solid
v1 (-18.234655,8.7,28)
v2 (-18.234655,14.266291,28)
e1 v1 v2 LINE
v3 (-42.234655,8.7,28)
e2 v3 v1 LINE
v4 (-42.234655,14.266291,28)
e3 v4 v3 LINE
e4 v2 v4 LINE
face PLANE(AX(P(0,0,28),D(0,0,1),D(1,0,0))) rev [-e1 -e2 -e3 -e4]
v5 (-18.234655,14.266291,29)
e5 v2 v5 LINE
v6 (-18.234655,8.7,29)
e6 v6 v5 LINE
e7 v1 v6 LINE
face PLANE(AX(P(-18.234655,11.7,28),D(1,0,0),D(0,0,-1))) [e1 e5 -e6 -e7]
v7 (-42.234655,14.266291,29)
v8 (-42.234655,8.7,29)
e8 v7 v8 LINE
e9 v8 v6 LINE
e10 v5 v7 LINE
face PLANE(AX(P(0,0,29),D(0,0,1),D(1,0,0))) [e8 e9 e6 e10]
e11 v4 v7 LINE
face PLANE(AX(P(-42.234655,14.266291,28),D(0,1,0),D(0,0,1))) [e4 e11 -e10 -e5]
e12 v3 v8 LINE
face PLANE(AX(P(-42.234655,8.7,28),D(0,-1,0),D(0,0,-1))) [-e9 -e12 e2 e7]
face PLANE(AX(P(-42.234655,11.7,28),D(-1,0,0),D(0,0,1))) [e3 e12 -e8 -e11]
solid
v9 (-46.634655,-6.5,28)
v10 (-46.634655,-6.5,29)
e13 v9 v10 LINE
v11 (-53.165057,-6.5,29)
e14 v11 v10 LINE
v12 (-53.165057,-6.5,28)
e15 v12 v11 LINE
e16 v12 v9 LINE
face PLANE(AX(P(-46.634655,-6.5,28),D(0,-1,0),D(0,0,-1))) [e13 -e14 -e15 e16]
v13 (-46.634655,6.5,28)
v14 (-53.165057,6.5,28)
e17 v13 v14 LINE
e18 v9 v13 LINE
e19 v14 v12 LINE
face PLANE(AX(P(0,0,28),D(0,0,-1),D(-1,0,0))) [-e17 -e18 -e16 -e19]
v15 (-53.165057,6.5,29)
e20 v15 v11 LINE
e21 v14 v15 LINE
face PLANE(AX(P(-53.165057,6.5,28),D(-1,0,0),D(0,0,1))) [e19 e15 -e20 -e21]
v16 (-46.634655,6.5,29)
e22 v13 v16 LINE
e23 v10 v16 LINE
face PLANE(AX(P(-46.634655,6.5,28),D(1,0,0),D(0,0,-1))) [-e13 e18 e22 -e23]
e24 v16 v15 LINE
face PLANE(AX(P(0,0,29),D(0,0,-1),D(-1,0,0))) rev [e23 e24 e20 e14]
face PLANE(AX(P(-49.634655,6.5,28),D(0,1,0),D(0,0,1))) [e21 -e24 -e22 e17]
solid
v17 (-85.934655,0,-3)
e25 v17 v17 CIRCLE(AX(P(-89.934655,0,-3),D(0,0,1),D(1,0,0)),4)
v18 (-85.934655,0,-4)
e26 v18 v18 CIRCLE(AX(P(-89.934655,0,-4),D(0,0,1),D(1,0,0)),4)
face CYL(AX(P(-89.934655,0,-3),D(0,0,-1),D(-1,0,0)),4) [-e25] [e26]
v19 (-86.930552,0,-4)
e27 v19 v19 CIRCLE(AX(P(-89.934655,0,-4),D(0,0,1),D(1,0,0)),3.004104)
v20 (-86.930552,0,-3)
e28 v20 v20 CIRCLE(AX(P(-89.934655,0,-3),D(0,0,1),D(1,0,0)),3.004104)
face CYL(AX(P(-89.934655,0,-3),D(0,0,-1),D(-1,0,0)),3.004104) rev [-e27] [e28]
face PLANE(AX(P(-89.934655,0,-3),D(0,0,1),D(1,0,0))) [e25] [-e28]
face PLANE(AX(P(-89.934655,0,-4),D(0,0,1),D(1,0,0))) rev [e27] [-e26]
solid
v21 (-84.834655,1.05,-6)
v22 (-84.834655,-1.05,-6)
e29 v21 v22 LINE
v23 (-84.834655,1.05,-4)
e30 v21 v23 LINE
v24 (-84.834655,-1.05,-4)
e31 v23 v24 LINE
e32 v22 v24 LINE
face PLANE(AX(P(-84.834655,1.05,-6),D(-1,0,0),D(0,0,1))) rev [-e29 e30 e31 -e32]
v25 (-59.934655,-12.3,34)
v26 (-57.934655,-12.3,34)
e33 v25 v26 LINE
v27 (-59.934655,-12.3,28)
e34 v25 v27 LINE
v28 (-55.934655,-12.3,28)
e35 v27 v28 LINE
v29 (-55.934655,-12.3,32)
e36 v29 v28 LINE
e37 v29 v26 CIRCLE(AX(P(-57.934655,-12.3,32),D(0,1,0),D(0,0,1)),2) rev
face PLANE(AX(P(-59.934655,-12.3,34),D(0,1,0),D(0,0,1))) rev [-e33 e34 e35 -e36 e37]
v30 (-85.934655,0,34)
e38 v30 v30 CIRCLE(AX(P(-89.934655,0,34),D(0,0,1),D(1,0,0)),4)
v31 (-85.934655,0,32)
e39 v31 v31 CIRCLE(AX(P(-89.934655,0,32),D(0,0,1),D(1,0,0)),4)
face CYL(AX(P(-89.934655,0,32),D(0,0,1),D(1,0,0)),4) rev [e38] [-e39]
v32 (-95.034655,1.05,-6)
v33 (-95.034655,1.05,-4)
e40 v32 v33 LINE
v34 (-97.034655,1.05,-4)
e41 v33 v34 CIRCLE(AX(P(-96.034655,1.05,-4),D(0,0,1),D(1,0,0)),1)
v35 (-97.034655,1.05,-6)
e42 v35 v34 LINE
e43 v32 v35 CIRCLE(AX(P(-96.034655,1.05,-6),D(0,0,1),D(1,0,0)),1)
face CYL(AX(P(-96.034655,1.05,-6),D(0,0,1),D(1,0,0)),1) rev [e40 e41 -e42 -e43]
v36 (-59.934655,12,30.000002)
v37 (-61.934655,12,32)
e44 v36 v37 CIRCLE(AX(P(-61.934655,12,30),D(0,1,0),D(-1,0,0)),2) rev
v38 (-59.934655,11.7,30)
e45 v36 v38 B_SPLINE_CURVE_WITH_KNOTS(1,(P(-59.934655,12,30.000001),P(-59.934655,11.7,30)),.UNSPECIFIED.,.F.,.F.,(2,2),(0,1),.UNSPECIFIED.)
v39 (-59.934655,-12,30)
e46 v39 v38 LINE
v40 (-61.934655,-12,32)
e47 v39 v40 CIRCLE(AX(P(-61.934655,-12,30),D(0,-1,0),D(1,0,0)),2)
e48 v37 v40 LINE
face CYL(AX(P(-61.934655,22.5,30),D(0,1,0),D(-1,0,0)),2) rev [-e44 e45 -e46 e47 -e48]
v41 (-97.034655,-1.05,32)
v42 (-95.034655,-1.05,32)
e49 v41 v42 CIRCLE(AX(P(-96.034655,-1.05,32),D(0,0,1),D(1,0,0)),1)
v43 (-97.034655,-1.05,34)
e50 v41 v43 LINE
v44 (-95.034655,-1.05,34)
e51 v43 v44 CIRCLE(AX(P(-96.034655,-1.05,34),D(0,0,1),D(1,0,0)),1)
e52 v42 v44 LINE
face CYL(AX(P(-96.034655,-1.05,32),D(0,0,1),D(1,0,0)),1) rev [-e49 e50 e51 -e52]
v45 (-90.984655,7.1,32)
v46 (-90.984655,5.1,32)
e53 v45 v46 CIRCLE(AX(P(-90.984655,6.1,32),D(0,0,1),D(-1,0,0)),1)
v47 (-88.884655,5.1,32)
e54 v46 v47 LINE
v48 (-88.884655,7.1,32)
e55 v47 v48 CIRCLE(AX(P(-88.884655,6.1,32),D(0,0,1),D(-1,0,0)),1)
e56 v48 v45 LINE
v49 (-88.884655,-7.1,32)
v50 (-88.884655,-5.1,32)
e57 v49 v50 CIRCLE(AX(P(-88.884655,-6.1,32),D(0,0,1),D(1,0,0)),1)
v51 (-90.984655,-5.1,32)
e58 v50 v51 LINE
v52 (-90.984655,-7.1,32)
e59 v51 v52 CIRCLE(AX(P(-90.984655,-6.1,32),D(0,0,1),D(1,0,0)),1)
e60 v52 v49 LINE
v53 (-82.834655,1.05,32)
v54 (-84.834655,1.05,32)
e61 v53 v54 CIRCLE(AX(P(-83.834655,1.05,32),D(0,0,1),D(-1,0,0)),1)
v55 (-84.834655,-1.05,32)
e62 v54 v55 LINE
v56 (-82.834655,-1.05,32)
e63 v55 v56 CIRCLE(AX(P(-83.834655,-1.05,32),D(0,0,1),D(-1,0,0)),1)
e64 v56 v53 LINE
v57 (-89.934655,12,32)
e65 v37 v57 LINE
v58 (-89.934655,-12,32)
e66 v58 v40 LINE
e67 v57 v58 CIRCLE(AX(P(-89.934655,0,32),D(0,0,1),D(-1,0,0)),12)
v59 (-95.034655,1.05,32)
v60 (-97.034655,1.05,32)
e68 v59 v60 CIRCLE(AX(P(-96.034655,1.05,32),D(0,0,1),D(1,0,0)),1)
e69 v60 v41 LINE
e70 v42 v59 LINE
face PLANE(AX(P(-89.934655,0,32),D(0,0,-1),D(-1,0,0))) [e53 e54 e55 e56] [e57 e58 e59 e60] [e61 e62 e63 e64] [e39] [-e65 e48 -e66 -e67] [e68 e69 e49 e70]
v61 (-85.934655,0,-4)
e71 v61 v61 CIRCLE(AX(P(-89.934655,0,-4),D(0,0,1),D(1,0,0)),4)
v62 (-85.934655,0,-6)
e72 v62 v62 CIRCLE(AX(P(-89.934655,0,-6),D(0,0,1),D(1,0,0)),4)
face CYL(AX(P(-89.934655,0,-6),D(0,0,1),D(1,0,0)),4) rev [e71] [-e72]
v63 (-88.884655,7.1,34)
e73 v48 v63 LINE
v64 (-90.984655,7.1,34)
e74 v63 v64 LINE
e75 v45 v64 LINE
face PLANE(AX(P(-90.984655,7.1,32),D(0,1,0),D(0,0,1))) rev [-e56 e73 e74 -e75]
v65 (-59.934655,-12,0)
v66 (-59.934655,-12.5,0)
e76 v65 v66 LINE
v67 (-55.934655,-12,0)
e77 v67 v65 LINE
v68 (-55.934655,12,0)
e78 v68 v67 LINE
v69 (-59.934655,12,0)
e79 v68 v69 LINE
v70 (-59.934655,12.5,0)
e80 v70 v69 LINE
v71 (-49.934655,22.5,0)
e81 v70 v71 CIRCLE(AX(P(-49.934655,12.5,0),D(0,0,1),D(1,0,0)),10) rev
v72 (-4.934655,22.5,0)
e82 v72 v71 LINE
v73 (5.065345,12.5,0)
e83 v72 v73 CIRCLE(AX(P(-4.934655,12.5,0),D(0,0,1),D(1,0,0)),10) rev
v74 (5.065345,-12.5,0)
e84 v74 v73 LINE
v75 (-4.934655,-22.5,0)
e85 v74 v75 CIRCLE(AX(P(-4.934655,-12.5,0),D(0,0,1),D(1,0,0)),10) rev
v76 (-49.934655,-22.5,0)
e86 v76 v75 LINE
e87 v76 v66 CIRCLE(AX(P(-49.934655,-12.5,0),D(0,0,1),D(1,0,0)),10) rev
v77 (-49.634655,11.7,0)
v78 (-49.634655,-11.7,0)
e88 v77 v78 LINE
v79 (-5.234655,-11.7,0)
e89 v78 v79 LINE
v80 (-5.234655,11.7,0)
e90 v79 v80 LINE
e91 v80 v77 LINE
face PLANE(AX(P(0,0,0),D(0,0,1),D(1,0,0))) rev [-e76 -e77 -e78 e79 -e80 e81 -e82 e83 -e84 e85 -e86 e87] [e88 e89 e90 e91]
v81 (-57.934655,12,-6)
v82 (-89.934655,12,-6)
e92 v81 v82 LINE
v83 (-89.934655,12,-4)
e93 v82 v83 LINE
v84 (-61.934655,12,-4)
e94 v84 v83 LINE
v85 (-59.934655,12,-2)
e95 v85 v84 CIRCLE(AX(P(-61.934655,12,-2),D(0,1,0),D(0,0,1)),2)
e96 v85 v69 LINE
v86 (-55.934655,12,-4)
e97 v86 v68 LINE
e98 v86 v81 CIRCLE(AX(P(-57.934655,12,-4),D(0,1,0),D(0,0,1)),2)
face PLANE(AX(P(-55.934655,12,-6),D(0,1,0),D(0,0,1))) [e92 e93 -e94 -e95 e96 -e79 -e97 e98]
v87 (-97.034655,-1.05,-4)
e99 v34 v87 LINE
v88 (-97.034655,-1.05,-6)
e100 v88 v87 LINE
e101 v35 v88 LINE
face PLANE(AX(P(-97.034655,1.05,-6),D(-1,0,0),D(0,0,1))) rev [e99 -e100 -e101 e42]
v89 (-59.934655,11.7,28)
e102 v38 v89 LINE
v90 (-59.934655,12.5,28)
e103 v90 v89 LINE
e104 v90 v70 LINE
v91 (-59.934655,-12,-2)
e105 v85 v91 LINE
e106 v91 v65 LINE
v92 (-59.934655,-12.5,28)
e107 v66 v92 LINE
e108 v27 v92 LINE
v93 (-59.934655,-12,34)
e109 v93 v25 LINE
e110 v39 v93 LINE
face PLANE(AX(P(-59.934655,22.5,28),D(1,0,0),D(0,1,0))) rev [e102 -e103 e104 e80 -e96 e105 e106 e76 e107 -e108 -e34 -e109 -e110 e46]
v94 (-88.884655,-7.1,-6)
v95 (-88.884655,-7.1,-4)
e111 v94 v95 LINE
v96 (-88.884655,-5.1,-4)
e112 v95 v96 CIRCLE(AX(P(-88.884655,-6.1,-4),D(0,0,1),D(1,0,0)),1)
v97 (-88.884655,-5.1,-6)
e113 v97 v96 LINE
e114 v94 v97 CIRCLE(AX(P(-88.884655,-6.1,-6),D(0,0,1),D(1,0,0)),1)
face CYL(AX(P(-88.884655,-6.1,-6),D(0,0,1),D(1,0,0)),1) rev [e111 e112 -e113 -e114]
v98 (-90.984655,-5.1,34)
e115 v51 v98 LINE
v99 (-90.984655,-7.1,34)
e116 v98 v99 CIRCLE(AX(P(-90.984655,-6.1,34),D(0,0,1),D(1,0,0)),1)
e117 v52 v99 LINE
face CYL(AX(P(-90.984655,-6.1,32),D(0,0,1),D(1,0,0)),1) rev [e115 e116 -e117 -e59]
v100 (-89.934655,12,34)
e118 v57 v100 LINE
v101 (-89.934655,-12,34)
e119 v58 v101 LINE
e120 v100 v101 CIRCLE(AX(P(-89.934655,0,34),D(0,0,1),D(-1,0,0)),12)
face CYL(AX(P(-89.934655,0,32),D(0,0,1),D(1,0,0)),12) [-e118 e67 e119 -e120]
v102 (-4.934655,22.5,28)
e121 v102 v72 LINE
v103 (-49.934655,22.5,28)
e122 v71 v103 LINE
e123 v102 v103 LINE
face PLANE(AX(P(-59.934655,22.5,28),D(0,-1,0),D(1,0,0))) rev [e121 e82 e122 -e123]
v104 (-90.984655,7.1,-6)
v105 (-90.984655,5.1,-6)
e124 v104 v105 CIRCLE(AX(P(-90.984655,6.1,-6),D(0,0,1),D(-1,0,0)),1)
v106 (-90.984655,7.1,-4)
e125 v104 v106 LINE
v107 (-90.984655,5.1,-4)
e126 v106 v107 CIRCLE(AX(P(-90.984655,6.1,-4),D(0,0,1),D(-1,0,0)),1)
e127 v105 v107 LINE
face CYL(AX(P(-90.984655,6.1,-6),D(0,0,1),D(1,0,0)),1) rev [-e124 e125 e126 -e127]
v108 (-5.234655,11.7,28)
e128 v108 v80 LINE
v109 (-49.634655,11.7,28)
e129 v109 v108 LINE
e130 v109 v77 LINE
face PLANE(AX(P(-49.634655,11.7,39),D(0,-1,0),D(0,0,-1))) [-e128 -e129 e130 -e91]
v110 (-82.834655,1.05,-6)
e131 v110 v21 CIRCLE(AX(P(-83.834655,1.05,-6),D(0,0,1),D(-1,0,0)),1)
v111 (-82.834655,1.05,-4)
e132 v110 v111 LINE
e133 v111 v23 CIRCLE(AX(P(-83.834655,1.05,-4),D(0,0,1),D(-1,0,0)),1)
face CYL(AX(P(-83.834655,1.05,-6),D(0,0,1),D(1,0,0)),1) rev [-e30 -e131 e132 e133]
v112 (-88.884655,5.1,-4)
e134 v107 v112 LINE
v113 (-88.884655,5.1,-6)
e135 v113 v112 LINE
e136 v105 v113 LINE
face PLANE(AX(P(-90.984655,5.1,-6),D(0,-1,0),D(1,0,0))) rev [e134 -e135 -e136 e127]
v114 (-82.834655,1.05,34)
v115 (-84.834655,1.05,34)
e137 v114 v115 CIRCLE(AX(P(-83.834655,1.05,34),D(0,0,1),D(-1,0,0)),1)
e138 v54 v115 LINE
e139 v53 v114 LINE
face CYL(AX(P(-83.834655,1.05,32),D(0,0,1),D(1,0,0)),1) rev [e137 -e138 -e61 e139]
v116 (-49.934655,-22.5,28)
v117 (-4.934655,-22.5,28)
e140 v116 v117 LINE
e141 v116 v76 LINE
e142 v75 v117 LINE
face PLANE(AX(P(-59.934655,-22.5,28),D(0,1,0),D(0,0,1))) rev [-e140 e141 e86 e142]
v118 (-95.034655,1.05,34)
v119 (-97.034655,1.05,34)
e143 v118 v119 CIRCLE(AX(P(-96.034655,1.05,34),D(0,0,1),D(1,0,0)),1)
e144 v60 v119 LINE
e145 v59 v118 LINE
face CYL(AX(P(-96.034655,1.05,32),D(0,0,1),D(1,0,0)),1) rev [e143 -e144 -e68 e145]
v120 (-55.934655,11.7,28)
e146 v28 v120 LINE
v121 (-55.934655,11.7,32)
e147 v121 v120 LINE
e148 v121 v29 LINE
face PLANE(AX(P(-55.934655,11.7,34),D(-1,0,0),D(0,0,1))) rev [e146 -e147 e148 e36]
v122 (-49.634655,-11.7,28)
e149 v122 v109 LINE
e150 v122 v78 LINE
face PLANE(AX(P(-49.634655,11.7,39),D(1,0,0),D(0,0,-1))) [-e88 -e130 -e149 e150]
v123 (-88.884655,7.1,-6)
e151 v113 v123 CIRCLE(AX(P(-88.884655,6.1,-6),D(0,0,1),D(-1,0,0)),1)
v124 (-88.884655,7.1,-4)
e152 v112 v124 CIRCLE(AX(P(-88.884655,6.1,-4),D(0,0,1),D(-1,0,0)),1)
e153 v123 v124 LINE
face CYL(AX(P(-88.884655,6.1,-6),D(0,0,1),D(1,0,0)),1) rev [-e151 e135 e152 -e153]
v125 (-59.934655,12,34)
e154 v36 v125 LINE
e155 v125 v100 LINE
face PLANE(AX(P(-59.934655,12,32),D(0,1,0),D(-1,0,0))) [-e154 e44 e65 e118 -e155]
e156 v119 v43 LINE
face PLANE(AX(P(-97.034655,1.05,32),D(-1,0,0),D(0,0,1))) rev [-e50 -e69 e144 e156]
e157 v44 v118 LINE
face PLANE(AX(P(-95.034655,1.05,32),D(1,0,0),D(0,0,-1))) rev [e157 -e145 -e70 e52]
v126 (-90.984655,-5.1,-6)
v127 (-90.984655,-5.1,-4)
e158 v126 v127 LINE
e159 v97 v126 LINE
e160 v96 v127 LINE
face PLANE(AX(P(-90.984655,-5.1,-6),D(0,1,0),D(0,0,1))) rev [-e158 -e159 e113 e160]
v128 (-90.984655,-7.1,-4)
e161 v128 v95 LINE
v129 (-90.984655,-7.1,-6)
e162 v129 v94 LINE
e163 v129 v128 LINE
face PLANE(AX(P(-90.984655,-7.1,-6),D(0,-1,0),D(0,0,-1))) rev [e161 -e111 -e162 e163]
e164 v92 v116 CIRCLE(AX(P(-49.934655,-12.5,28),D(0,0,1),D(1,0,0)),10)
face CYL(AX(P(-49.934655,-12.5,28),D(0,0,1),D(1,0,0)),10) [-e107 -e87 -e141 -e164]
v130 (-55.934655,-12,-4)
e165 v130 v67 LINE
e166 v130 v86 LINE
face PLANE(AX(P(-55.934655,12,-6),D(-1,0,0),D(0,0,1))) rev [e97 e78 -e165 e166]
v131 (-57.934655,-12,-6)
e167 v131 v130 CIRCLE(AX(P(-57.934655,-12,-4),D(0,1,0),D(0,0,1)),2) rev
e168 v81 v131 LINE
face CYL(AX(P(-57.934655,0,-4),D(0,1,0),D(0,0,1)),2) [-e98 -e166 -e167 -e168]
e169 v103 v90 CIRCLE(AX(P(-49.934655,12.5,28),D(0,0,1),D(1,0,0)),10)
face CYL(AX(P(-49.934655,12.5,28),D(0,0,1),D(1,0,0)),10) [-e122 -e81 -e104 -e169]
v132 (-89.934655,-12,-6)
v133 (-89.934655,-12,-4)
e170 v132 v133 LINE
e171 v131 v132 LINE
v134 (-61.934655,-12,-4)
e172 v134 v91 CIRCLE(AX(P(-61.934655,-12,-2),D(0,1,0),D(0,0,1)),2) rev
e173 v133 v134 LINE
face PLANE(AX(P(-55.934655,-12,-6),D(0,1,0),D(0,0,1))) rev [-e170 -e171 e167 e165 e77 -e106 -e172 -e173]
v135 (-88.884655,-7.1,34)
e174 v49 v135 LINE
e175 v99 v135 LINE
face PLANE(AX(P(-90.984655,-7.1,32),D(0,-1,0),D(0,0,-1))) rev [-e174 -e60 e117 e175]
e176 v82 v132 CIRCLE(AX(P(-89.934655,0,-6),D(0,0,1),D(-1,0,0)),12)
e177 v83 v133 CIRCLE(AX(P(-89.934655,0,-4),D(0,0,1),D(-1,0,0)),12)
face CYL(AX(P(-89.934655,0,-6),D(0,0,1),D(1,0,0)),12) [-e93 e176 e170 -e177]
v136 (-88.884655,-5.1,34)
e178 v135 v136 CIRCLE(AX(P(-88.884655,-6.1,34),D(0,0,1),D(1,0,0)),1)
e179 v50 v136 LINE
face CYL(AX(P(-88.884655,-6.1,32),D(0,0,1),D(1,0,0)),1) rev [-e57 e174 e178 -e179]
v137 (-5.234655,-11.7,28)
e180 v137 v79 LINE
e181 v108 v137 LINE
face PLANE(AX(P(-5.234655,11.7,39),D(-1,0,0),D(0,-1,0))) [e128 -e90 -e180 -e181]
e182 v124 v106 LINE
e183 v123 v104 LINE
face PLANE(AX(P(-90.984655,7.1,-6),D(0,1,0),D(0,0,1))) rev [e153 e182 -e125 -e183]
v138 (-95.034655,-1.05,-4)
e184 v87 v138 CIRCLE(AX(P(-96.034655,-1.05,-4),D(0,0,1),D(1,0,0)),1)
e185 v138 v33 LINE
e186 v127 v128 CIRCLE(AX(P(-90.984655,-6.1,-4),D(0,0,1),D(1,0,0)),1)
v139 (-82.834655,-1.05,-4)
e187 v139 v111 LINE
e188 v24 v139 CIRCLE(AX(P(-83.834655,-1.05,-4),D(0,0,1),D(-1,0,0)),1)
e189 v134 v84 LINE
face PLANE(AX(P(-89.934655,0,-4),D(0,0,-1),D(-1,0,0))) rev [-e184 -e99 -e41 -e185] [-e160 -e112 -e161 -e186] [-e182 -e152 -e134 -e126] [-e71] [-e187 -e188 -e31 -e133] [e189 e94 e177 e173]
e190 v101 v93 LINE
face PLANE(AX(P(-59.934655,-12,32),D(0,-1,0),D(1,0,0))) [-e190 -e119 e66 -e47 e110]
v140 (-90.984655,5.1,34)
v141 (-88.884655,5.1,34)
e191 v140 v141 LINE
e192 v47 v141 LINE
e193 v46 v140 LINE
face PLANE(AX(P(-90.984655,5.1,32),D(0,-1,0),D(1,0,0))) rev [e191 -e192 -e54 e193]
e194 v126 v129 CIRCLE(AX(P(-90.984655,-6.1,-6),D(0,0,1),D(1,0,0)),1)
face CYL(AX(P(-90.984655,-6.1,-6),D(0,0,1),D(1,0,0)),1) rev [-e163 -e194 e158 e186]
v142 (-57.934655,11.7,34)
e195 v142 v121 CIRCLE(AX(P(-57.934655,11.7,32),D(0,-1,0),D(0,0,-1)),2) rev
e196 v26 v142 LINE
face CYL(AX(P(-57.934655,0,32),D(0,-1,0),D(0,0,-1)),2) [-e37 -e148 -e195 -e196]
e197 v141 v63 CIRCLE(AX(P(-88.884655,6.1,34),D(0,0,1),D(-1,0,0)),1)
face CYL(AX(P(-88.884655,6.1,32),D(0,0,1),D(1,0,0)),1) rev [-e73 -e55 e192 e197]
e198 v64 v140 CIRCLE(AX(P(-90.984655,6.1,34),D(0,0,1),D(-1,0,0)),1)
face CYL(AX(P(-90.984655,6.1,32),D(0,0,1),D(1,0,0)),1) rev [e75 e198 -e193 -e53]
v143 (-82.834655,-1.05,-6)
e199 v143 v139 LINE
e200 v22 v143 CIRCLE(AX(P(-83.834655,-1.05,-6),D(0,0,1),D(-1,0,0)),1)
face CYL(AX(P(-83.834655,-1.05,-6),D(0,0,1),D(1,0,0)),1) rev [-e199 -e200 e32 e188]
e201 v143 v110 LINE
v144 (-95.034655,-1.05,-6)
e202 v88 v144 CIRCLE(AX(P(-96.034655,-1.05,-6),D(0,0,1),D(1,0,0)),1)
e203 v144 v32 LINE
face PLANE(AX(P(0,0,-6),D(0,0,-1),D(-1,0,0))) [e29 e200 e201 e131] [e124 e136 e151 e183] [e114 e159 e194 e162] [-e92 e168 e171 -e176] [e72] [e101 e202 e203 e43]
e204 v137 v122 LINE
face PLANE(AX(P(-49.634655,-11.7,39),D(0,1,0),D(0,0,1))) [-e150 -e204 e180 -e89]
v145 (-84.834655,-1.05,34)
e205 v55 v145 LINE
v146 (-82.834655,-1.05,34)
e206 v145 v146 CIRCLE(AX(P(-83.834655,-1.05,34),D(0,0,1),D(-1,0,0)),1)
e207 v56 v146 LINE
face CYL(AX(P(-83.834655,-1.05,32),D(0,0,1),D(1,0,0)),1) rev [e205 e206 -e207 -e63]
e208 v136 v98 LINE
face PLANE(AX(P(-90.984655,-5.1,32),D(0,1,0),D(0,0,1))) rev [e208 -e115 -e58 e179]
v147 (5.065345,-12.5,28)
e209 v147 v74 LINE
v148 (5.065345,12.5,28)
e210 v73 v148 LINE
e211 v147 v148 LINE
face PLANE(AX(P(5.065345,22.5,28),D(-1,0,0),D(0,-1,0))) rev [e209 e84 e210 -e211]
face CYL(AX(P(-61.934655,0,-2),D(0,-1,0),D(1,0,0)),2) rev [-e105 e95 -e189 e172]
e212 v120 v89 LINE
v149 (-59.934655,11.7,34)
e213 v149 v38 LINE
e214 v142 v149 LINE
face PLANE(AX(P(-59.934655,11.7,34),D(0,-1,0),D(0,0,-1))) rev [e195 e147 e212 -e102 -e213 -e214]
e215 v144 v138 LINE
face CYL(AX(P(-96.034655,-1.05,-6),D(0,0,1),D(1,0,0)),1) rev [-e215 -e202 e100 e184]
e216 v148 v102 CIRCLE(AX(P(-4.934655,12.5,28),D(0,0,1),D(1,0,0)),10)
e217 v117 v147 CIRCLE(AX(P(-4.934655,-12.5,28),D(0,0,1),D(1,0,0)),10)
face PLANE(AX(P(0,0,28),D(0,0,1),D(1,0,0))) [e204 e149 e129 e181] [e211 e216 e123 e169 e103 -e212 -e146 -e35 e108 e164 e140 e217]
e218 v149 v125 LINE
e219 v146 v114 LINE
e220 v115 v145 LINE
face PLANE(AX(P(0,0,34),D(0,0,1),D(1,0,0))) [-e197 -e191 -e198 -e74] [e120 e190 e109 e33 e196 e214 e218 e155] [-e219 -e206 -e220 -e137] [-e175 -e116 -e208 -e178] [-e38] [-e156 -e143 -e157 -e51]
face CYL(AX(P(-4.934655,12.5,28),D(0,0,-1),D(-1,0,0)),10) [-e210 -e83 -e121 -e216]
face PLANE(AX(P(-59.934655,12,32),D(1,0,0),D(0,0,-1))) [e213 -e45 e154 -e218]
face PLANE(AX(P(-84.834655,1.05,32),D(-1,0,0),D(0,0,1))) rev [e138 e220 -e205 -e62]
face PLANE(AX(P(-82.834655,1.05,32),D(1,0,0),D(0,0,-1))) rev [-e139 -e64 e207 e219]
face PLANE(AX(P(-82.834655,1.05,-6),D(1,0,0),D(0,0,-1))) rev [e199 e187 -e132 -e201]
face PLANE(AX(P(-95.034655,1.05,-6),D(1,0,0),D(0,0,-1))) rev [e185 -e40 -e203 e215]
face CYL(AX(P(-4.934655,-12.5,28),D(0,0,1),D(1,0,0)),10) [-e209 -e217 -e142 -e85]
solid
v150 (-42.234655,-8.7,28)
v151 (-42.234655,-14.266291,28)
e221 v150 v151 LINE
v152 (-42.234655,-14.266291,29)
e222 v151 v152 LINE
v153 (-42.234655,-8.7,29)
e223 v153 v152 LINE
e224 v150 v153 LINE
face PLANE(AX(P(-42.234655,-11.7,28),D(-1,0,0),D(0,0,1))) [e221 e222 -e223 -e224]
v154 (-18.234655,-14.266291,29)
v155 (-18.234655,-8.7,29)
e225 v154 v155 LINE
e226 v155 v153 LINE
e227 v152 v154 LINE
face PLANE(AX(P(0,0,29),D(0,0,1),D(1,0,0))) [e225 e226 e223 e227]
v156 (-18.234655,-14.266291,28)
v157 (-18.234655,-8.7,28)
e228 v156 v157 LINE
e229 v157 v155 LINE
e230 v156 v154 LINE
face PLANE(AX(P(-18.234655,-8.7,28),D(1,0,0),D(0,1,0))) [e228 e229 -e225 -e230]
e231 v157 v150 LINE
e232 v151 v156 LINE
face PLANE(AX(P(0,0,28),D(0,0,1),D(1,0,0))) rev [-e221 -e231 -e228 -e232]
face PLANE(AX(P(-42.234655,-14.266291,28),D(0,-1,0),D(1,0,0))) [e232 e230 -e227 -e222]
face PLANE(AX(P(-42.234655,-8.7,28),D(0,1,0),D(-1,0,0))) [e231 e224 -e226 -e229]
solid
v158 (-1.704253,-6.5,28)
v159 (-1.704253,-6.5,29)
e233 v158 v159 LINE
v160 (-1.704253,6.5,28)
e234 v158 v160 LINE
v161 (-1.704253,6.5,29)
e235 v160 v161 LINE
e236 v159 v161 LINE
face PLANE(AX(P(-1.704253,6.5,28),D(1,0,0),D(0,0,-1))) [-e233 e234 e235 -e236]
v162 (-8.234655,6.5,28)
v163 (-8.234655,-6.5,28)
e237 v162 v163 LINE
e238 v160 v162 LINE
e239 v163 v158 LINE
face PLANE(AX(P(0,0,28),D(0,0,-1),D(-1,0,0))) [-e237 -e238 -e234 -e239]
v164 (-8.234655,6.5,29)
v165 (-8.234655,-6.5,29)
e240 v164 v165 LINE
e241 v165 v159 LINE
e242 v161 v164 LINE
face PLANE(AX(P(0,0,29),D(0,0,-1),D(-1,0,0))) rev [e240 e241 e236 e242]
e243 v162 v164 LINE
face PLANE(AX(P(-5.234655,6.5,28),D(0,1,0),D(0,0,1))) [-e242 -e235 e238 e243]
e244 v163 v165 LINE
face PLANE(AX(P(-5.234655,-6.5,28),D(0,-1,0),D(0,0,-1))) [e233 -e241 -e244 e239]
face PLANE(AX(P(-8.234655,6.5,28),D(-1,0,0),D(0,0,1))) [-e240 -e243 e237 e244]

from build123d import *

# Parameters (mm, degrees)
SKETCH_1_W             = 65
SKETCH_1_H             = 45
EXTRUDE_1_DEPTH        = 28
SKETCH_2_W             = 44.4
SKETCH_2_H             = 23.4
CUT_EXTRUDE_1_DEPTH    = 39
SKETCH_3_W             = 4
SKETCH_3_H             = 24
EXTRUDE_2_DEPTH        = 6
SKETCH_7_R             = 4
EXTRUDE_3_DEPTH        = 1
SKETCH_8_W             = 4
SKETCH_8_H             = 24
EXTRUDE_4_DEPTH        = 6
FILLET_1_R             = 10
FILLET_2_R             = 10
FILLET_3_R             = 10
FILLET_4_R             = 10
PATTERN_LINEAR_2_COUNT = 2
PATTERN_LINEAR_2_PITCH = 38
FILLET_5_R             = 2
FILLET_6_R             = 2
FILLET_7_R             = 2
FILLET_8_R             = 2
SKETCH_9_R             = 4
SKETCH_9_R_2           = 3.004103595
EXTRUDE_5_DEPTH        = 1
EXTRUDE_6_DEPTH        = 1
EXTRUDE_6_2_DEPTH      = 1
EXTRUDE_6_3_DEPTH      = 1
EXTRUDE_6_4_DEPTH      = 1


with BuildPart() as part:
    # 草圖1 → 填料-伸長1 (new body)
    with BuildSketch(Plane.XY):
        with Locations((-27.434655272, 0)):
            Rectangle(SKETCH_1_W, SKETCH_1_H)
    extrude(amount=EXTRUDE_1_DEPTH)

    # 草圖2 → 除料-伸長1 (cut)
    with BuildSketch(Plane.XY):
        with Locations((-27.434655272, 0)):
            Rectangle(SKETCH_2_W, SKETCH_2_H)
    extrude(amount=CUT_EXTRUDE_1_DEPTH, mode=Mode.SUBTRACT)

    # 草圖3 → 填料-伸長2 (add)
    with BuildSketch(Plane.XY.offset(28)):
        with Locations((-57.934655272, -0.3)):
            Rectangle(SKETCH_3_W, SKETCH_3_H)
    extrude(amount=EXTRUDE_2_DEPTH)

    # 草圖7 → 填料-伸長3 (add, symmetric)
    with BuildSketch(Plane.XY.offset(33)):
        with BuildLine():
            Line((-59.934655272, 12), (-89.934655272, 12))
            ThreePointArc((-89.934655272, 12), (-101.934655272, 0), (-89.934655272, -12))
            Line((-89.934655272, -12), (-59.934655272, -12))
            Line((-59.934655272, -12), (-59.934655272, 12))
        make_face()
        with Locations((-89.934655272, 0)):
            Circle(SKETCH_7_R, mode=Mode.SUBTRACT)
        with BuildLine():
            Line((-95.034655272, 1.05), (-95.034655272, -1.05))
            ThreePointArc((-95.034655272, -1.05), (-96.034655272, -2.05), (-97.034655272, -1.05))
            Line((-97.034655272, -1.05), (-97.034655272, 1.05))
            ThreePointArc((-97.034655272, 1.05), (-96.034655272, 2.05), (-95.034655272, 1.05))
        make_face(mode=Mode.SUBTRACT)
        with BuildLine():
            Line((-90.984655272, -5.1), (-88.884655272, -5.1))
            ThreePointArc((-88.884655272, -5.1), (-87.884655272, -6.1), (-88.884655272, -7.1))
            Line((-88.884655272, -7.1), (-90.984655272, -7.1))
            ThreePointArc((-90.984655272, -7.1), (-91.984655272, -6.1), (-90.984655272, -5.1))
        make_face(mode=Mode.SUBTRACT)
        with BuildLine():
            Line((-90.984655272, 5.1), (-88.884655272, 5.1))
            ThreePointArc((-88.884655272, 5.1), (-87.884655272, 6.1), (-88.884655272, 7.1))
            Line((-88.884655272, 7.1), (-90.984655272, 7.1))
            ThreePointArc((-90.984655272, 7.1), (-91.984655272, 6.1), (-90.984655272, 5.1))
        make_face(mode=Mode.SUBTRACT)
        with BuildLine():
            Line((-84.834655272, 1.05), (-84.834655272, -1.05))
            ThreePointArc((-84.834655272, -1.05), (-83.834655272, -2.05), (-82.834655272, -1.05))
            Line((-82.834655272, -1.05), (-82.834655272, 1.05))
            ThreePointArc((-82.834655272, 1.05), (-83.834655272, 2.05), (-84.834655272, 1.05))
        make_face(mode=Mode.SUBTRACT)
    extrude_3 = extrude(amount=EXTRUDE_3_DEPTH, both=True)

    # 草圖8 → 填料-伸長4 (add)
    with BuildSketch(Plane(origin=(0, 0, 0), x_dir=(-1, 0, 0), z_dir=(0, 0, -1))):
        with Locations((57.934655272, 0)):
            Rectangle(SKETCH_8_W, SKETCH_8_H)
    extrude(amount=EXTRUDE_4_DEPTH)

    # 圓角1
    fillet_1_edges = [part.edges().sort_by_distance(p)[0] for p in [
        (-59.934655272, -22.5, 14),
    ]]
    fillet(fillet_1_edges, radius=FILLET_1_R)

    # 圓角2
    fillet_2_edges = [part.edges().sort_by_distance(p)[0] for p in [
        (-59.934655272, 22.5, 14),
    ]]
    fillet(fillet_2_edges, radius=FILLET_2_R)

    # 圓角3
    fillet_3_edges = [part.edges().sort_by_distance(p)[0] for p in [
        (5.065344728, 22.5, 14),
    ]]
    fillet(fillet_3_edges, radius=FILLET_3_R)

    # 圓角4
    fillet_4_edges = [part.edges().sort_by_distance(p)[0] for p in [
        (5.065344728, -22.5, 14),
    ]]
    fillet(fillet_4_edges, radius=FILLET_4_R)

    # 直線複製排列2: 填料-伸長3 ×2
    with Locations(*[(0, 0, -i * PATTERN_LINEAR_2_PITCH) for i in range(1, PATTERN_LINEAR_2_COUNT)]):
        add(extrude_3)

    # 圓角5
    fillet_5_edges = [part.edges().sort_by_distance(p)[0] for p in [
        (-55.934655272, 0, -6),
    ]]
    fillet(fillet_5_edges, radius=FILLET_5_R)

    # 圓角6
    fillet_6_edges = [part.edges().sort_by_distance(p)[0] for p in [
        (-59.934655272, 0, -4),
    ]]
    fillet(fillet_6_edges, radius=FILLET_6_R)

    # 圓角7
    # the kernel refuses this fillet: 2 mm, written as the material it adds along each edge
    with BuildSketch(Plane(origin=(-59.934655272, -12, 32), x_dir=(0, 0, -1), z_dir=(0, 1, 0))) as fillet_7_piece_1_section:
        with BuildLine():
            CenterArc((FILLET_7_R, FILLET_7_R), FILLET_7_R, 180, 90)
            Line((0, FILLET_7_R), (0, 0))
            Line((0, 0), (FILLET_7_R, 0))
        make_face()
    fillet_7_piece_1 = extrude(amount=23.7, mode=Mode.PRIVATE)
    fillet_7_piece_1 = split(fillet_7_piece_1, bisect_by=Plane(origin=(-59.934655272, -0.15, 31.593053741), z_dir=(-1, 0, 0)), keep=Keep.TOP, mode=Mode.PRIVATE)
    add(fillet_7_piece_1)
    with BuildSketch(Plane(origin=(-59.934655272, -12, 32), x_dir=(0, 0, -1), z_dir=(0, 1, 0))) as fillet_7_piece_2_section:
        with BuildLine():
            CenterArc((FILLET_7_R, FILLET_7_R), FILLET_7_R, 180, 90)
            Line((0, FILLET_7_R), (0, 0))
            Line((0, 0), (FILLET_7_R, 0))
        make_face()
    fillet_7_piece_2 = extrude(amount=28.7, mode=Mode.PRIVATE)
    fillet_7_piece_2 = split(fillet_7_piece_2, bisect_by=Plane(origin=(-60.428557372, 11.7, 31.593053741), z_dir=(0, 1, 0)), keep=Keep.TOP, mode=Mode.PRIVATE)
    fillet_7_piece_2 = split(fillet_7_piece_2, bisect_by=Plane(origin=(-59.934655272, 11.85, 31.593053741), z_dir=(-1, 0, 0)), keep=Keep.TOP, mode=Mode.PRIVATE)
    fillet_7_piece_2 = split(fillet_7_piece_2, bisect_by=Plane(origin=(-60.428557372, 12, 31.593053741), z_dir=(0, -1, 0)), keep=Keep.TOP, mode=Mode.PRIVATE)
    add(fillet_7_piece_2)

    # 圓角8
    fillet_8_edges = [part.edges().sort_by_distance(p)[0] for p in [
        (-55.934655272, -0.3, 34),
    ]]
    fillet(fillet_8_edges, radius=FILLET_8_R)


with BuildPart() as body_2:
    # 草圖9 → 填料-伸長5 (new body)
    with BuildSketch(Plane.XY.offset(-4)):
        with Locations((-89.934655272, 0)):
            Circle(SKETCH_9_R)
        with Locations((-89.934655272, 0)):
            Circle(SKETCH_9_R_2, mode=Mode.SUBTRACT)
    extrude(amount=EXTRUDE_5_DEPTH)


with BuildPart() as body_3:
    # 草圖10 → 填料-伸長6 (new body)
    with BuildSketch(Plane.XY.offset(29)):
        Polygon((-42.234655272, 11.7), (-42.234655272, 14.266291238), (-18.234655272, 14.266291238), (-18.234655272, 11.7), (-18.234655272, 8.7), (-42.234655272, 8.7), align=None)
    extrude(amount=-EXTRUDE_6_DEPTH)


with BuildPart() as body_4:
    # 草圖10 → Extrude 6 2 (new body)
    with BuildSketch(Plane.XY.offset(29)):
        Polygon((-49.634655272, 6.5), (-53.165057103, 6.5), (-53.165057103, -6.5), (-49.634655272, -6.5), (-46.634655272, -6.5), (-46.634655272, 6.5), align=None)
    extrude(amount=-EXTRUDE_6_2_DEPTH)


with BuildPart() as body_5:
    # 草圖10 → Extrude 6 3 (new body)
    with BuildSketch(Plane.XY.offset(29)):
        Polygon((-42.234655272, -11.7), (-42.234655272, -8.7), (-18.234655272, -8.7), (-18.234655272, -11.7), (-18.234655272, -14.266291238), (-42.234655272, -14.266291238), align=None)
    extrude(amount=-EXTRUDE_6_3_DEPTH)


with BuildPart() as body_6:
    # 草圖10 → Extrude 6 4 (new body)
    with BuildSketch(Plane.XY.offset(29)):
        Polygon((-5.234655272, 6.5), (-8.234655272, 6.5), (-8.234655272, -6.5), (-5.234655272, -6.5), (-1.70425344, -6.5), (-1.70425344, 6.5), align=None)
    extrude(amount=-EXTRUDE_6_4_DEPTH)


solid = Compound([part.part, body_2.part, body_3.part, body_4.part, body_5.part, body_6.part])
